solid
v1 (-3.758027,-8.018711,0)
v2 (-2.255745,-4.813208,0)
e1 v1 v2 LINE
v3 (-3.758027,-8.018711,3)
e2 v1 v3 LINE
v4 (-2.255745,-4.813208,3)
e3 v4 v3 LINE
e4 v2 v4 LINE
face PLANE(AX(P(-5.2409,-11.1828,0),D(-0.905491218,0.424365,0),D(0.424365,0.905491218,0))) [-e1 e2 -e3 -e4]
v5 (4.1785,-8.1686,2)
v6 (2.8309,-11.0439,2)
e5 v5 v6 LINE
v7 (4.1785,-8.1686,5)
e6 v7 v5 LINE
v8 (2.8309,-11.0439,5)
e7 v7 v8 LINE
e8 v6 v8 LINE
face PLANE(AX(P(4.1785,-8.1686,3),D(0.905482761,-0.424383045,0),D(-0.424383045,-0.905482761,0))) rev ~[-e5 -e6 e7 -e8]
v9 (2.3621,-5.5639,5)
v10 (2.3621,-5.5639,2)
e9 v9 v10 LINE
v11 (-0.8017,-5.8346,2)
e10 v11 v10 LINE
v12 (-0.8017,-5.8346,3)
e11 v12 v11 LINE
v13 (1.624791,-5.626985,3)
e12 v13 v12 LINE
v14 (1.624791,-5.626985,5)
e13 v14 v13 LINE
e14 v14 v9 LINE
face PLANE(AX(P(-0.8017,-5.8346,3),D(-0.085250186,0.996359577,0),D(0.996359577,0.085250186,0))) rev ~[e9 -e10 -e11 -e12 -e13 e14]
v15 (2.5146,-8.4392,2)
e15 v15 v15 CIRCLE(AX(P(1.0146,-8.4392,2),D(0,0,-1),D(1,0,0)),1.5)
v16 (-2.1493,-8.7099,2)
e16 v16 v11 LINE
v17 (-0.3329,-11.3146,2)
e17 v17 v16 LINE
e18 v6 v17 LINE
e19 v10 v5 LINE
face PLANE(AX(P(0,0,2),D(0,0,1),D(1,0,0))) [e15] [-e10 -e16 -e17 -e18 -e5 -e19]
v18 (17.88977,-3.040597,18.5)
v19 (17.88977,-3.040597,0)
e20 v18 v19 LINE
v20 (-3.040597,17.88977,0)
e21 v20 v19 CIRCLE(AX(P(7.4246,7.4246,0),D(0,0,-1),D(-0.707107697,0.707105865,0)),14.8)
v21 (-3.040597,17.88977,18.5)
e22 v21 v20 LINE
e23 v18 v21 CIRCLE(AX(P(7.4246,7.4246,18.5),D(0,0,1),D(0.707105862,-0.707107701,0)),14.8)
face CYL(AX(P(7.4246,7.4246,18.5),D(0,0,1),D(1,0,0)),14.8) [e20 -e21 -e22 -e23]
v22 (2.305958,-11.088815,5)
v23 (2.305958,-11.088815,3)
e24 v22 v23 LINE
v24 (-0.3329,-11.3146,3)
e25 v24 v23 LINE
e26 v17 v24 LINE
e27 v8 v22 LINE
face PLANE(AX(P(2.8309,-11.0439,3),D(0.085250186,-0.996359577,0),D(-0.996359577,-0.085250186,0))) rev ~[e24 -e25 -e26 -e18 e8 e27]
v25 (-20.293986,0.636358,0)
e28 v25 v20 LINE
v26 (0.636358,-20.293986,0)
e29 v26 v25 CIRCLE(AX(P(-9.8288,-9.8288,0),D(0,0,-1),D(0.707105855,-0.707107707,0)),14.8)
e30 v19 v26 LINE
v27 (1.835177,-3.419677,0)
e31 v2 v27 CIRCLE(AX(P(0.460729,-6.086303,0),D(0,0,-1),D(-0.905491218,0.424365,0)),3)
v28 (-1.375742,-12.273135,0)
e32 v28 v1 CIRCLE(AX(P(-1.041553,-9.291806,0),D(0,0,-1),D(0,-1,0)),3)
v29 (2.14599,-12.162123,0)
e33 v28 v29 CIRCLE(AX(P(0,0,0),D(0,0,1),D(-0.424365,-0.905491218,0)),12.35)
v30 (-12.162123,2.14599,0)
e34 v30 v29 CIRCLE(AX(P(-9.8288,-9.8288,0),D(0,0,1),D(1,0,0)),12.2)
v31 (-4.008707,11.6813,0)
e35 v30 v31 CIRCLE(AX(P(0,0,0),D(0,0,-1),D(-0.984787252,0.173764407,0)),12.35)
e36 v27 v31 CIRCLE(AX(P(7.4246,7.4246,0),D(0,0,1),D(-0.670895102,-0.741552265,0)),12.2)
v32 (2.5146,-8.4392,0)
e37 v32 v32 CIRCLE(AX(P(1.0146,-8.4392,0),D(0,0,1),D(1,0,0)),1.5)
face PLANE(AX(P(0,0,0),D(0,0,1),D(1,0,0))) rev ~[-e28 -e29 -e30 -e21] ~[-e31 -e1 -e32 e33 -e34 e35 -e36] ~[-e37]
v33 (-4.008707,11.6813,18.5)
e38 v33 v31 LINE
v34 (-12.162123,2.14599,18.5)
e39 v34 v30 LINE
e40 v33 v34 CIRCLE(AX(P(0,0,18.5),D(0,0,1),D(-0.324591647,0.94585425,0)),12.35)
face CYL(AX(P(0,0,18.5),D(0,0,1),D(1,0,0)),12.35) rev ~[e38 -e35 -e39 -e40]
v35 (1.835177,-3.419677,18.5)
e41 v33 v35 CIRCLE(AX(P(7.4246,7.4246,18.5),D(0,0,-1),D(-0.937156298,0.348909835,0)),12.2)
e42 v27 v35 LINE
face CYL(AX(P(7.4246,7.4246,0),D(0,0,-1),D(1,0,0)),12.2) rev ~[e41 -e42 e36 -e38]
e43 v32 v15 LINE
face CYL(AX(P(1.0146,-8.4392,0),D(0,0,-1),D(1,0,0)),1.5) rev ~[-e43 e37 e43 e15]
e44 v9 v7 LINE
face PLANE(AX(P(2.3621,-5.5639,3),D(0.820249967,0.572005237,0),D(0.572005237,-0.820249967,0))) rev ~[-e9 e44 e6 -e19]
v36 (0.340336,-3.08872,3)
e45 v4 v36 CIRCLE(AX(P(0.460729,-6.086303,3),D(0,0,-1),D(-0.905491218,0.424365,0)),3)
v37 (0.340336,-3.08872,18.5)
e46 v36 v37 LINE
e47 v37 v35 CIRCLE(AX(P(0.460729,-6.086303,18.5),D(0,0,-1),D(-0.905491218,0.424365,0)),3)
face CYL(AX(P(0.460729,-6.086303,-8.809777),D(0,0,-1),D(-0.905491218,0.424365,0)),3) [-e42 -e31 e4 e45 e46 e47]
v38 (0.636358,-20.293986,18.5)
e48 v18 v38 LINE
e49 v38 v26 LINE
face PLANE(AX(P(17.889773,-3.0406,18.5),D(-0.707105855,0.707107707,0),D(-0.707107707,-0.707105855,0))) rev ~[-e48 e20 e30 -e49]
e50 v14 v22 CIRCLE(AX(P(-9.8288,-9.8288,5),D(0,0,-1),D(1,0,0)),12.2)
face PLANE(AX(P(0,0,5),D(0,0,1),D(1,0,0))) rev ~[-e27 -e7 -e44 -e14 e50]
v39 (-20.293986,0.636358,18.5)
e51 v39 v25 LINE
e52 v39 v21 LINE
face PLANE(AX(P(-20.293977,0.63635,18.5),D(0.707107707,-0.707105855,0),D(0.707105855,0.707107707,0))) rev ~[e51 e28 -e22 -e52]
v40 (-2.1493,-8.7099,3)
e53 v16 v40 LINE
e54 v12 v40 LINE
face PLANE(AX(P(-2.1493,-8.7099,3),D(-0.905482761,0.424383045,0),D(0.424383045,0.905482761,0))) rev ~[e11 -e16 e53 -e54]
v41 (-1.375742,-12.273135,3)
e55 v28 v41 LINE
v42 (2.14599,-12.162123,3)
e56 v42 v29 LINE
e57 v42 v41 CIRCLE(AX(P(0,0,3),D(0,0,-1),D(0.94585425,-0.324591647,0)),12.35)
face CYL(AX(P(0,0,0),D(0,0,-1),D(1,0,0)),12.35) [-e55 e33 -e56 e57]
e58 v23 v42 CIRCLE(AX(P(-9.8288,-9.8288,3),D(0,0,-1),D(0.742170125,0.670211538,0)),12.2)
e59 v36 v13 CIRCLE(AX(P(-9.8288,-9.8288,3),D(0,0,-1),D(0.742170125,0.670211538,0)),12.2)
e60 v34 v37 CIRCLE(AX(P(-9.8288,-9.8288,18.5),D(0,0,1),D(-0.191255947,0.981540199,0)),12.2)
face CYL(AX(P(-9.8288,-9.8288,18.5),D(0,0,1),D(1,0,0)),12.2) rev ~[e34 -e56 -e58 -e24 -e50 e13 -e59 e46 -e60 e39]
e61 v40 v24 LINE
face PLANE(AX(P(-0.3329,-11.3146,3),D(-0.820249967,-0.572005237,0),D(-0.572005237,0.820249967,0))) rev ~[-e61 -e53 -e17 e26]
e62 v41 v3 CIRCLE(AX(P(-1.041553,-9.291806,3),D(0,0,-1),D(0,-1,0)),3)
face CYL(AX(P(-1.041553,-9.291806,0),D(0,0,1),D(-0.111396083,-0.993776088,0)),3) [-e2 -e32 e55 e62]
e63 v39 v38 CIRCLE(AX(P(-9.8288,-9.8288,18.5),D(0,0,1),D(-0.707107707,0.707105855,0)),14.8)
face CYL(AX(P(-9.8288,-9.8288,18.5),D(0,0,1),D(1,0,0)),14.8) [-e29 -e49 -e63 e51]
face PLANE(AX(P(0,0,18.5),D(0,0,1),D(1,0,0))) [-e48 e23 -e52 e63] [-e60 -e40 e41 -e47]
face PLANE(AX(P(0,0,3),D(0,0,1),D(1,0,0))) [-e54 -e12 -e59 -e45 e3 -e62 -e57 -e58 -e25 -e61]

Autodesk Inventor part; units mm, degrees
ref_plane "YZ Plane" through (0, 0, 0) normal (1, 0, 0) x (0, 1, 0)
ref_plane "XZ Plane" through (0, 0, 0) normal (0, 1, 0) x (-1, 0, 0)
ref_plane "XY Plane" through (0, 0, 0) normal (0, 0, 1) x (1, 0, 0)
sketch "Sketch1" plane through (0, 0, 0) normal (0, 0, 1) x (1, 0, 0)
  circle A0 centre (0, 0) radius 12.35
  circle A1 centre (7.4246, 7.4246) radius 12.2
  line L0 (-13.413, -13.413) -> (25.4094, 25.4094) construction
  line L1 (-10.6165, 0) -> (15.2552, 0) construction
  line L2 (7.4246, 7.4246) -> (15.8638, 6.41) construction
  line L3 (16.6649, 18.5138) -> (22.6753, 24.5242) construction
  circle A2 centre (15.8638, 6.41) radius 1.5
  line L4 (7.4246, 7.4246) -> (-1.0146, 8.4392) construction
  circle A3 centre (-1.0146, 8.4392) radius 1.5
  line L5 (0, 0) -> (-1.0146, 8.4392) construction
  line L6 (0, 0) -> (1.0146, -8.4392) construction
  circle A4 centre (1.0146, -8.4392) radius 1.5
  circle A5 centre (-9.8288, -9.8288) radius 12.2
  line L7 (-5.2409, -11.1828) -> (0, 0)
  point P0 (11.6813, -4.0087)
  point P1 (-0.7603, -1.6223)
  dimension "d0" = 24.7
  dimension "d1" = 24.4
  dimension "d2" = 0
  dimension "d3" = 45
  dimension "d4" = 0
  dimension "d5" = 10.5
  dimension "d20" = 8.5
  dimension "d21" = 3
  dimension "d22" = 3
  dimension "d23" = 3
  dimension "d24" = 24.4
  dimension "d25" = 24.4
  dimension "d26" = 4.5
extrude "Extrusion1" add sketch "Sketch1" along normal blind 3 contours A0 A5 A4 L7 A1 | A0 L7 A5 A4
sketch "Sketch3" plane through (0, 0, 3) normal (0, 0, 1) x (1, 0, 0)
  circle A0 centre (0, 0) radius 12.35
  circle A1 centre (7.4246, 7.4246) radius 12.2
  line L0 (-13.413, -13.413) -> (25.4094, 25.4094) construction
  line L1 (-10.6165, 0) -> (15.2552, 0) construction
  line L2 (7.4246, 7.4246) -> (15.8638, 6.41) construction
  line L3 (16.6649, 18.5138) -> (22.6753, 24.5242) construction
  circle A2 centre (15.8638, 6.41) radius 1.5
  line L4 (7.4246, 7.4246) -> (-1.0146, 8.4392) construction
  circle A3 centre (-1.0146, 8.4392) radius 1.5
  line L5 (0, 0) -> (-1.0146, 8.4392) construction
  line L6 (0, 0) -> (1.0146, -8.4392) construction
  circle A4 centre (1.0146, -8.4392) radius 1.5
  circle A5 centre (-9.8288, -9.8288) radius 12.2
  line L7 (-5.2409, -11.1828) -> (0, 0)
  point P0 (11.6813, -4.0087)
  point P1 (-0.7603, -1.6223)
  point P2 (-0.7743, -1.6522)
  point P3 (2.1356, -7.4425)
  point P4 (2.3507, -9.1211)
  point P5 (2.146, -12.1621)
  dimension "d32" = 24.7
  dimension "d33" = 24.4
  dimension "d34" = 0
  dimension "d35" = 45
  dimension "d36" = 0
  dimension "d37" = 10.5
  dimension "d38" = 8.5
  dimension "d39" = 3
  dimension "d40" = 3
  dimension "d41" = 3
  dimension "d42" = 24.4
  dimension "d43" = 24.4
  dimension "d44" = 4.5
extrude "Extrusion3" add sketch "Sketch3" along normal blind 15.5 contours A0 A5 A4 L7 A1 | A4 A5 picked at (2.3363, -8.2121)
sketch "Sketch4" plane through (0, 0, 3) normal (0, 0, 1) x (1, 0, 0)
  line L0 (-2.1493, -8.7099) -> (-0.8017, -5.8346)
  line L1 (-0.8017, -5.8346) -> (2.3621, -5.5639)
  line L2 (2.3621, -5.5639) -> (4.1785, -8.1686)
  line L3 (4.1785, -8.1686) -> (2.8309, -11.0439)
  line L4 (2.8309, -11.0439) -> (-0.3329, -11.3146)
  line L5 (-0.3329, -11.3146) -> (-2.1493, -8.7099)
  point P0 (0, 0)
  point P1 (1.0146, -8.4392)
  dimension "d49" = 5.5
extrude "Extrusion4" cut sketch "Sketch4" along normal blind 2 and the other way blind 1
sketch "Sketch5" plane through (0, 0, 18.5) normal (0, 0, 1) x (1, 0, 0)
  circle A0 centre (0, 0) radius 12.35
  circle A1 centre (7.4246, 7.4246) radius 12.2
  line L0 (-13.413, -13.413) -> (25.4094, 25.4094) construction
  line L1 (-10.6165, 0) -> (15.2552, 0) construction
  line L2 (7.4246, 7.4246) -> (15.8638, 6.41) construction
  line L3 (16.6649, 18.5138) -> (22.6753, 24.5242) construction
  circle A2 centre (15.8638, 6.41) radius 1.5
  line L4 (7.4246, 7.4246) -> (-1.0146, 8.4392) construction
  circle A3 centre (-1.0146, 8.4392) radius 1.5
  line L5 (0, 0) -> (-1.0146, 8.4392) construction
  line L6 (0, 0) -> (1.0146, -8.4392) construction
  circle A4 centre (1.0146, -8.4392) radius 1.5
  circle A5 centre (-9.8288, -9.8288) radius 12.2
  line L7 (-5.2409, -11.1828) -> (0, 0)
  line L8 (-30.7591, -9.8288) -> (7.4246, 28.355)
  line L9 (7.4246, 28.355) -> (28.355, 7.4246)
  line L10 (28.355, 7.4246) -> (-9.8288, -30.7591)
  line L11 (-9.8288, -30.7591) -> (-30.7591, -9.8288)
  circle A6 centre (-9.8288, -9.8288) radius 14.8
  circle A7 centre (7.4246, 7.4246) radius 14.8
  point P0 (11.6813, -4.0087)
  point P1 (-0.7603, -1.6223)
  point P2 (2.146, -12.1621)
  point P3 (-12.1621, 2.146)
  point P4 (-4.0087, 11.6813)
  point P5 (0.6364, -20.294)
  point P6 (17.8898, -3.0406)
  point P7 (-3.0406, 17.8898)
  point P8 (-20.294, 0.6364)
  dimension "d54" = 24.7
  dimension "d55" = 24.4
  dimension "d56" = 0
  dimension "d57" = 45
  dimension "d58" = 0
  dimension "d59" = 10.5
  dimension "d60" = 8.5
  dimension "d61" = 3
  dimension "d62" = 3
  dimension "d63" = 3
  dimension "d64" = 24.4
  dimension "d65" = 24.4
  dimension "d66" = 4.5
  dimension "d67" = 14.8
  dimension "d68" = 14.8
  dimension "d69" = 29.6
  dimension "d70" = 14.8
extrude "Extrusion5" add sketch "Sketch5" against normal blind 18.5 contours A0 A7 A1 | A0 A6 L8 A7 | A7 L10 A6 A0 | A0 A5 A6
fillet "Fillet1" radius 3 1 edges at (-5.2409, -11.1828, 1.5)
fillet "Fillet2" radius 3 1 edges at (-0.7603, -1.6223, 9.25)
properties part number "Hiolder_26"
